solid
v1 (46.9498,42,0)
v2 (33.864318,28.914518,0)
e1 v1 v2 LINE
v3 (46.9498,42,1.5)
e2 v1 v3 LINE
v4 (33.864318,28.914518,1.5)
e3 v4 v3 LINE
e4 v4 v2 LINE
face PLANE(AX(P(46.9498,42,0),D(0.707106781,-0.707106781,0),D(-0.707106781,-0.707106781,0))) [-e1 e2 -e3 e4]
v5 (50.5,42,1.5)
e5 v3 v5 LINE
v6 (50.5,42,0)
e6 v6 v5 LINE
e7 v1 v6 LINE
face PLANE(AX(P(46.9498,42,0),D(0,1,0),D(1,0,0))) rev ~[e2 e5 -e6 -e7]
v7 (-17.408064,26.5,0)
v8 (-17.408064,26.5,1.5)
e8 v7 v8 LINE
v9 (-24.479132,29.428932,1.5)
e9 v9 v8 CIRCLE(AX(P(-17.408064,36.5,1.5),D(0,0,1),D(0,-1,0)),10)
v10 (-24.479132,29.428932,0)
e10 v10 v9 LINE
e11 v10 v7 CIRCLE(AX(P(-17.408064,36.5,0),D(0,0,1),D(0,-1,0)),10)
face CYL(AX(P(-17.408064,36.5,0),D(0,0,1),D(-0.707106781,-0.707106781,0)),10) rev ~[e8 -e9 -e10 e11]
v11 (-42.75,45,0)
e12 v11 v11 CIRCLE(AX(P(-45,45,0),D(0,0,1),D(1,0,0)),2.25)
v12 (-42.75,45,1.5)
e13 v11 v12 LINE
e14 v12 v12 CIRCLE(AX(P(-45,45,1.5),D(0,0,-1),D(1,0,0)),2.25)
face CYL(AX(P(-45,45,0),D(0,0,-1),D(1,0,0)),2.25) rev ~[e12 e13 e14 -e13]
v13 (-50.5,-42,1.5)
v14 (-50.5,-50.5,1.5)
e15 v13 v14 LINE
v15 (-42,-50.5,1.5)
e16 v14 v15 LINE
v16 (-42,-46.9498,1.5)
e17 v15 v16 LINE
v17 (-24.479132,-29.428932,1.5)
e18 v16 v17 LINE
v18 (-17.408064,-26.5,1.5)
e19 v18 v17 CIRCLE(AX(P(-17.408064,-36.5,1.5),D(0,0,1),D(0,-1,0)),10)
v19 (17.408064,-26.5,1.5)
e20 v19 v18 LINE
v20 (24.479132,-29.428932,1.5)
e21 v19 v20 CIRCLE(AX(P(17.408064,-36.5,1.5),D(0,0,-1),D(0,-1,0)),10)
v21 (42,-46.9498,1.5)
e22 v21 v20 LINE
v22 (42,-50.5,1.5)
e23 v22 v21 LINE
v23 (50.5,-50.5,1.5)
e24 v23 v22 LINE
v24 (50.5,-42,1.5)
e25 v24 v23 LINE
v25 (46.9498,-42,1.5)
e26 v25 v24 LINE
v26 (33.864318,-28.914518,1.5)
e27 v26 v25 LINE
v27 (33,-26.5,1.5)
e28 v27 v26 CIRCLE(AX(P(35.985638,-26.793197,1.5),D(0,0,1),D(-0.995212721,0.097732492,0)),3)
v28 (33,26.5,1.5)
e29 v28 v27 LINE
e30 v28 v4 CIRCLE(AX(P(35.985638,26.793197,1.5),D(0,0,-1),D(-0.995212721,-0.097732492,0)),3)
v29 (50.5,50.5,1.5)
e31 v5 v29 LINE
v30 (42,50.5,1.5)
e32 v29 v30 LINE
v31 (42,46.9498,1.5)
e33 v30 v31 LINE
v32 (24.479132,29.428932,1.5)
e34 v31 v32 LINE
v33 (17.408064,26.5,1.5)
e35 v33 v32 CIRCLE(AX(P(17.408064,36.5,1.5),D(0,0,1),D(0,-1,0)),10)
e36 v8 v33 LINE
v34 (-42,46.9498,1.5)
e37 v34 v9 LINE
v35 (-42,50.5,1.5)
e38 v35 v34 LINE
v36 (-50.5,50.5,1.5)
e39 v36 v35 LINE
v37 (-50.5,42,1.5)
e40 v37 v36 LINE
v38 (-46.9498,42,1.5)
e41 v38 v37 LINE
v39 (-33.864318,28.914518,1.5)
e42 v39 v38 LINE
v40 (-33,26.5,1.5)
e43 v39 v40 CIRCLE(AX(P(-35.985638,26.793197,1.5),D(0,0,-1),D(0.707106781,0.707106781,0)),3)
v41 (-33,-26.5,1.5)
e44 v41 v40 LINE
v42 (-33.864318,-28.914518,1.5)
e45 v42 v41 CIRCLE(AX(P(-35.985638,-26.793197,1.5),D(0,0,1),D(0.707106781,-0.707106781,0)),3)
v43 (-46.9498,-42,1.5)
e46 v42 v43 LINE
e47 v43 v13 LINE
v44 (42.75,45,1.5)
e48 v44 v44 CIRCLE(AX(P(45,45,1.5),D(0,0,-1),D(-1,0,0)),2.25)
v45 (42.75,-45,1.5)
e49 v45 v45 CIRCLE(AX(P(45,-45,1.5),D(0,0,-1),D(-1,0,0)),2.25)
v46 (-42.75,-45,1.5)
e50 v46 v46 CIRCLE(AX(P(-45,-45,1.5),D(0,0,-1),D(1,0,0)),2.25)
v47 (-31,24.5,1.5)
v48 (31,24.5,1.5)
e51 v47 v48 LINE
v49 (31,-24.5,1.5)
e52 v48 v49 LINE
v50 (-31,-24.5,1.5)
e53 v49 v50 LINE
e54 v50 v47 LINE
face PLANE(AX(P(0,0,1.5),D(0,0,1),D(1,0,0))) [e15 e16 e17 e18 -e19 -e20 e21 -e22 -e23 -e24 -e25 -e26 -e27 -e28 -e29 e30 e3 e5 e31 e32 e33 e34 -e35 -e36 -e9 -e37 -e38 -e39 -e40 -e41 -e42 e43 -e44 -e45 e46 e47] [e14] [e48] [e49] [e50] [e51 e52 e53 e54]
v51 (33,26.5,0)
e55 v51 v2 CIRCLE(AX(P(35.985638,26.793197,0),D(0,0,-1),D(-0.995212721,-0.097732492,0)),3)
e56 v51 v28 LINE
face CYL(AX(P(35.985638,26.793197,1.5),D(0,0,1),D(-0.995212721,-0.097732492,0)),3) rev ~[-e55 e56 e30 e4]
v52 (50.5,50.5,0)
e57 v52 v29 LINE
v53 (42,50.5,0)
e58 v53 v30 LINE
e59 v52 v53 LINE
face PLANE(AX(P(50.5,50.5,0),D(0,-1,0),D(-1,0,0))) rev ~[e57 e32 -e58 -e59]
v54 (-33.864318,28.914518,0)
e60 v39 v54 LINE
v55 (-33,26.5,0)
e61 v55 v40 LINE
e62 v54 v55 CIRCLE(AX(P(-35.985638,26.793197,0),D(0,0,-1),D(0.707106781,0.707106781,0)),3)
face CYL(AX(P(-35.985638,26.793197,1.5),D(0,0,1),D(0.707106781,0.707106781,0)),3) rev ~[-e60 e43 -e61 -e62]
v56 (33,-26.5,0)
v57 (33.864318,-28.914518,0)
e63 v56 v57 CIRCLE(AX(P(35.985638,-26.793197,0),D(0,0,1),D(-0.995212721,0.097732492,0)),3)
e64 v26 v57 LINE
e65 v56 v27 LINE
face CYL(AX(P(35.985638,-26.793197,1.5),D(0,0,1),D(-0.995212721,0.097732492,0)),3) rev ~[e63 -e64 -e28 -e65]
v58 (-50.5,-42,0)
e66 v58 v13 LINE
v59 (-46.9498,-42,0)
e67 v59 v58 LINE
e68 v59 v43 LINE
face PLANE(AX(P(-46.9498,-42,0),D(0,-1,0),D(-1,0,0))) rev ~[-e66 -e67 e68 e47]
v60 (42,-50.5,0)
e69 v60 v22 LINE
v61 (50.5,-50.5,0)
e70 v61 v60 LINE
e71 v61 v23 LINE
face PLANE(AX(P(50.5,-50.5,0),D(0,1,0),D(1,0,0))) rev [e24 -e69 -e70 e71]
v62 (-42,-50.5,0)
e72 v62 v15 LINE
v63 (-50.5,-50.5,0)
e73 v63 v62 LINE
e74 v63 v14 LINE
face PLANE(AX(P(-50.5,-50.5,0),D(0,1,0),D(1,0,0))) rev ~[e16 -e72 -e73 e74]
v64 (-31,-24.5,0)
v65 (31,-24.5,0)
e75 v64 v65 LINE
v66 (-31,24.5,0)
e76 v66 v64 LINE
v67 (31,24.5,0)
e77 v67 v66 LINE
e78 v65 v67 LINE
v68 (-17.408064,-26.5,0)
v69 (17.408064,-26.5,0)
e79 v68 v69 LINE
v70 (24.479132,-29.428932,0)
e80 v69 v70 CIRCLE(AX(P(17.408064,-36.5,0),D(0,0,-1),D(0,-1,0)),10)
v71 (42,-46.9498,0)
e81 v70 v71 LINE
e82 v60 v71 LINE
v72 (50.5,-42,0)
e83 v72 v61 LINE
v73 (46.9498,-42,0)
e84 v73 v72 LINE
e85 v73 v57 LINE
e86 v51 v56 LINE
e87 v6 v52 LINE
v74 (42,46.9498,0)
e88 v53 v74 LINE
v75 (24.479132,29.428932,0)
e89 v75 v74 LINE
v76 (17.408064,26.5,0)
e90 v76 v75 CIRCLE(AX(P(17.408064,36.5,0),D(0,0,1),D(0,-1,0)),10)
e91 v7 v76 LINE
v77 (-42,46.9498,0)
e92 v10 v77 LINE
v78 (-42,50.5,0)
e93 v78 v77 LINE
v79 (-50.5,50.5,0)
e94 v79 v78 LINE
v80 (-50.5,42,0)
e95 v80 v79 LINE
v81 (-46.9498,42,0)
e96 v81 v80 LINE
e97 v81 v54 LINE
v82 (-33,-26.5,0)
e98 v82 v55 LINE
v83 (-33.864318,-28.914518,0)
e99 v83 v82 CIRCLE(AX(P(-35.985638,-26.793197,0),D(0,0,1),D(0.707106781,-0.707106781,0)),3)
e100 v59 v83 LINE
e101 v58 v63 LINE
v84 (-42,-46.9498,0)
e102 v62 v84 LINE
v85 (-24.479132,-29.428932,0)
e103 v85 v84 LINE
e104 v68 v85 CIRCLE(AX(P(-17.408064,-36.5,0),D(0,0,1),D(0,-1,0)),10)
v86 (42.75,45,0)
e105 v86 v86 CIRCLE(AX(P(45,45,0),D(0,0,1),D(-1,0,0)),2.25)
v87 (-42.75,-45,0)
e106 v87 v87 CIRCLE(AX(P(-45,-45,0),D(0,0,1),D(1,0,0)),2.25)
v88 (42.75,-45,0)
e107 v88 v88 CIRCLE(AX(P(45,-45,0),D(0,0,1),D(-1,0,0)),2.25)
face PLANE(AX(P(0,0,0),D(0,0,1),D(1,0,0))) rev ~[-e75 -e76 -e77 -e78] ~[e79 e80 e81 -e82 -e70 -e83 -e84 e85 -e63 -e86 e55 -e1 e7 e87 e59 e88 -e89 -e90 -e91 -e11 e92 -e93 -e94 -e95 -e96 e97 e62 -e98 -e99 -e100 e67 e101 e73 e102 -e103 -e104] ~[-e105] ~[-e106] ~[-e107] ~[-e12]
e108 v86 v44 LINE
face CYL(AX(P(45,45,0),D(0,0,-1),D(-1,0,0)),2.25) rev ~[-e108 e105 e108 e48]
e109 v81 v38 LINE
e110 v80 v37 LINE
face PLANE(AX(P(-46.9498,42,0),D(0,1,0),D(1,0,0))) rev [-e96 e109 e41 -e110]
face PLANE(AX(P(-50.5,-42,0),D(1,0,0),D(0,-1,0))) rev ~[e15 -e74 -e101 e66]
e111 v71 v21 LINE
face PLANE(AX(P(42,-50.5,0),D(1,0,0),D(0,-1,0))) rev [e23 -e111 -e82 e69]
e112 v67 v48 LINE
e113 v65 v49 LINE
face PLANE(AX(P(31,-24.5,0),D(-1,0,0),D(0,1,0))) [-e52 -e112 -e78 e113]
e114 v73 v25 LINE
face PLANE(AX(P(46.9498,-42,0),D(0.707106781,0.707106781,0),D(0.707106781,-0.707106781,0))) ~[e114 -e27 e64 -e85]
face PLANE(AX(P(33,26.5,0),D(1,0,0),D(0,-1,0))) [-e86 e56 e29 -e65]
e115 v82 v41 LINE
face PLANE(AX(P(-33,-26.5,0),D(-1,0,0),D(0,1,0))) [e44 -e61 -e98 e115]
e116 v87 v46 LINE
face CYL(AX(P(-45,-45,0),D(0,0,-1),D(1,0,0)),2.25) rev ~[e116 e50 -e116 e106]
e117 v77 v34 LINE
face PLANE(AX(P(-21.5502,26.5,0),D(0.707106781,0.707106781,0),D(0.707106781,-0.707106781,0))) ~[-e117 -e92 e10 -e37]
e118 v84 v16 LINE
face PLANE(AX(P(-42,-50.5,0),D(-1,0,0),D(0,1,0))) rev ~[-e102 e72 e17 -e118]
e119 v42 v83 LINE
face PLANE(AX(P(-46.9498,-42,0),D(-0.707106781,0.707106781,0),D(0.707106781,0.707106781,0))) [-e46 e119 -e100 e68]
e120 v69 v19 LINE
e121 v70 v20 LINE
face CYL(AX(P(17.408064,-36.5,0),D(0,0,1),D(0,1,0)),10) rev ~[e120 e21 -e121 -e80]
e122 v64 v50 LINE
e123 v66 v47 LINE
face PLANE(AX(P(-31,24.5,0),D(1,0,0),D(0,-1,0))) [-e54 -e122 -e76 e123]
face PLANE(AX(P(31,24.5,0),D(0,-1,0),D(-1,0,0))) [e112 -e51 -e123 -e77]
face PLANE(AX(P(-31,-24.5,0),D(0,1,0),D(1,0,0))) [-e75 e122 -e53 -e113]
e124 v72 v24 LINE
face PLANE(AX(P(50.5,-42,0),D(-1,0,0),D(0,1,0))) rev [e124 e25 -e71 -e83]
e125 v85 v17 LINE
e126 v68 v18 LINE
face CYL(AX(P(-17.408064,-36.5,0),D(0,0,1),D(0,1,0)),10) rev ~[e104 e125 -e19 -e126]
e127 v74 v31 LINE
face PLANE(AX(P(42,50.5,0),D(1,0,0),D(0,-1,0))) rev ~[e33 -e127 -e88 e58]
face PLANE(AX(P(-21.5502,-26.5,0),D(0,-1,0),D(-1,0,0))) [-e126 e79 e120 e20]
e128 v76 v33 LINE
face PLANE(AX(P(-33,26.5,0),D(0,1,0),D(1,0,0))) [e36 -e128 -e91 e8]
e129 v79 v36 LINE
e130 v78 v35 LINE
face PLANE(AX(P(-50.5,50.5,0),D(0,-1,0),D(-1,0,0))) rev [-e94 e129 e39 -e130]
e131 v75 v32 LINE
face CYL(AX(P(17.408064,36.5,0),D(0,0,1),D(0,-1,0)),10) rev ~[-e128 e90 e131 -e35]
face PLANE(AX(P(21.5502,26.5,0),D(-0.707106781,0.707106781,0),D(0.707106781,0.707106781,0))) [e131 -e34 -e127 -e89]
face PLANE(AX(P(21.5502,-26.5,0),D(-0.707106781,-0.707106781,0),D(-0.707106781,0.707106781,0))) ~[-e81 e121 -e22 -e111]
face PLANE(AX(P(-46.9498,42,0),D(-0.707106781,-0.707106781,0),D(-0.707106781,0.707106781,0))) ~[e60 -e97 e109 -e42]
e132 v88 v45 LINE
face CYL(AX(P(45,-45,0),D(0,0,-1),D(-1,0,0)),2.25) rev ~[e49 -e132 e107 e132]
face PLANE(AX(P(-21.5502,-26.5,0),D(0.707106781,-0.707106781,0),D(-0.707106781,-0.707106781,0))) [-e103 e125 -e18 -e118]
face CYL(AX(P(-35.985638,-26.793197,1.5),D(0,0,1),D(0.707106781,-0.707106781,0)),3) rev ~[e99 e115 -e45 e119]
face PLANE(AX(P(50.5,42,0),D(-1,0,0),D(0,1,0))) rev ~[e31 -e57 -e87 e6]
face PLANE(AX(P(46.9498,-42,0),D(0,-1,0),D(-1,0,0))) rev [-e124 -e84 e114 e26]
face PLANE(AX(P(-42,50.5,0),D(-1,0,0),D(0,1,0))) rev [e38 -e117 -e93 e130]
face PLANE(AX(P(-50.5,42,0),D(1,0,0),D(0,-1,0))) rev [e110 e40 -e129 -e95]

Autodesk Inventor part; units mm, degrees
ref_plane "YZ Plane" through (0, 0, 0) normal (1, 0, 0) x (0, 1, 0)
ref_plane "XZ Plane" through (0, 0, 0) normal (0, 1, 0) x (-1, 0, 0)
ref_plane "XY Plane" through (0, 0, 0) normal (0, 0, 1) x (1, 0, 0)
sketch "Sketch1" plane through (0, 0, 0) normal (0, 0, 1) x (1, 0, 0)
  line L0 (-48, 48) -> (48, 48) construction
  line L1 (48, 48) -> (48, -48) construction
  line L2 (48, -48) -> (-48, -48) construction
  line L3 (-48, -48) -> (-48, 48) construction
  circle A0 centre (-45, 45) radius 2.25
  circle A1 centre (45, 45) radius 2.25
  line L4 (45, 45) -> (-45, 45) construction
  line L5 (-45, 45) -> (-45, -45) construction
  line L6 (-45, -45) -> (45, -45) construction
  line L7 (45, -45) -> (45, 45) construction
  circle A2 centre (45, -45) radius 2.25
  circle A3 centre (-45, -45) radius 2.25
  line L8 (-50.5, -50.5) -> (-42, -50.5)
  line L9 (-42, -50.5) -> (-42, -42)
  line L10 (-42, -42) -> (-50.5, -42)
  line L11 (-50.5, -42) -> (-50.5, -50.5)
  line L12 (0, 0) -> (-48, -48) construction
  line L13 (-33, 26.5) -> (33, 26.5)
  line L14 (33, 26.5) -> (33, -26.5)
  line L15 (33, -26.5) -> (-33, -26.5)
  line L16 (-33, -26.5) -> (-33, 26.5)
  line L17 (-2.4749, 2.4749) -> (2.4749, -2.4749)
  line L18 (2.4749, -2.4749) -> (-42.5251, -47.4749)
  line L19 (-42.5251, -47.4749) -> (-47.4749, -42.5251)
  line L20 (-47.4749, -42.5251) -> (-2.4749, 2.4749)
  line L21 (0, 0) -> (-45, -45) construction
  line L22 (31, 24.5) -> (-31, 24.5)
  line L23 (-31, 24.5) -> (-31, -24.5)
  line L24 (-31, -24.5) -> (31, -24.5)
  line L25 (31, -24.5) -> (31, 24.5)
  point P0 (0, 48)
  point P1 (48, 0)
  point P2 (33, 0)
  point P3 (0, 26.5)
  dimension "d0" = 96
  dimension "d1" = 96
  dimension "d2" = 4.5
  dimension "d3" = 4.5
  dimension "d4" = 3
  dimension "d5" = 4.5
  dimension "d6" = 4.5
  dimension "d9" = 3
  dimension "d10" = 3
  dimension "d11" = 66
  dimension "d12" = 53
  dimension "d13" = 7
  dimension "d14" = 0
  dimension "d23" = 5.5
  dimension "d24" = 5.5
  dimension "d25" = 2
extrude "Extrusion1" add sketch "Sketch1" along normal blind 1.5 contours L20 L24 L18 L15 | L15 L16 L13 L14 L18 L24 L25 L22 L23 L20 | L24 L23 L22 L25 L18 L17 L20 | L20 L17 L18 L24
extrude "Extrusion2" add sketch "Sketch1" along normal blind 1.5 contours A3 L19 | A3 L19 L20 L10 L9 L18 | A3 L19 L18 L9 L8 L11 L10 L20 | L20 L15 L18 L9 L10 | L20 L24 L18 L15 | L20 L17 L18 L24 picked at (-45.2318, -44.2867)
extrude "Extrusion3" cut sketch "Sketch1" along normal blind 10 contours A3 L19 | L19 A3
mirror "Mirror1" about plane through (0, 0, 0) normal (1, 0, 0) of "Extrusion2", "Extrusion3"
mirror "Mirror2" about plane through (0, 0, 0) normal (0, 1, 0) of "Extrusion2", "Extrusion3", "Mirror1"
extrude "Extrusion4" cut sketch "Sketch1" along normal blind 10 contours L24 L23 L22 L25 L18 L17 L20 | L20 L17 L18 L24
fillet "Fillet3" radius 3 4 edges at (31.4497, -26.5, 0.75) (31.4497, 26.5, 0.75) (-31.4497, 26.5, 0.75) (-31.4497, -26.5, 0.75)
fillet "Fillet4" radius 10 4 edges at (-21.5503, -26.5, 0.75) (21.5503, -26.5, 0.75) (21.5503, 26.5, 0.75) (-21.5503, 26.5, 0.75)
properties part number "BattHolder"
